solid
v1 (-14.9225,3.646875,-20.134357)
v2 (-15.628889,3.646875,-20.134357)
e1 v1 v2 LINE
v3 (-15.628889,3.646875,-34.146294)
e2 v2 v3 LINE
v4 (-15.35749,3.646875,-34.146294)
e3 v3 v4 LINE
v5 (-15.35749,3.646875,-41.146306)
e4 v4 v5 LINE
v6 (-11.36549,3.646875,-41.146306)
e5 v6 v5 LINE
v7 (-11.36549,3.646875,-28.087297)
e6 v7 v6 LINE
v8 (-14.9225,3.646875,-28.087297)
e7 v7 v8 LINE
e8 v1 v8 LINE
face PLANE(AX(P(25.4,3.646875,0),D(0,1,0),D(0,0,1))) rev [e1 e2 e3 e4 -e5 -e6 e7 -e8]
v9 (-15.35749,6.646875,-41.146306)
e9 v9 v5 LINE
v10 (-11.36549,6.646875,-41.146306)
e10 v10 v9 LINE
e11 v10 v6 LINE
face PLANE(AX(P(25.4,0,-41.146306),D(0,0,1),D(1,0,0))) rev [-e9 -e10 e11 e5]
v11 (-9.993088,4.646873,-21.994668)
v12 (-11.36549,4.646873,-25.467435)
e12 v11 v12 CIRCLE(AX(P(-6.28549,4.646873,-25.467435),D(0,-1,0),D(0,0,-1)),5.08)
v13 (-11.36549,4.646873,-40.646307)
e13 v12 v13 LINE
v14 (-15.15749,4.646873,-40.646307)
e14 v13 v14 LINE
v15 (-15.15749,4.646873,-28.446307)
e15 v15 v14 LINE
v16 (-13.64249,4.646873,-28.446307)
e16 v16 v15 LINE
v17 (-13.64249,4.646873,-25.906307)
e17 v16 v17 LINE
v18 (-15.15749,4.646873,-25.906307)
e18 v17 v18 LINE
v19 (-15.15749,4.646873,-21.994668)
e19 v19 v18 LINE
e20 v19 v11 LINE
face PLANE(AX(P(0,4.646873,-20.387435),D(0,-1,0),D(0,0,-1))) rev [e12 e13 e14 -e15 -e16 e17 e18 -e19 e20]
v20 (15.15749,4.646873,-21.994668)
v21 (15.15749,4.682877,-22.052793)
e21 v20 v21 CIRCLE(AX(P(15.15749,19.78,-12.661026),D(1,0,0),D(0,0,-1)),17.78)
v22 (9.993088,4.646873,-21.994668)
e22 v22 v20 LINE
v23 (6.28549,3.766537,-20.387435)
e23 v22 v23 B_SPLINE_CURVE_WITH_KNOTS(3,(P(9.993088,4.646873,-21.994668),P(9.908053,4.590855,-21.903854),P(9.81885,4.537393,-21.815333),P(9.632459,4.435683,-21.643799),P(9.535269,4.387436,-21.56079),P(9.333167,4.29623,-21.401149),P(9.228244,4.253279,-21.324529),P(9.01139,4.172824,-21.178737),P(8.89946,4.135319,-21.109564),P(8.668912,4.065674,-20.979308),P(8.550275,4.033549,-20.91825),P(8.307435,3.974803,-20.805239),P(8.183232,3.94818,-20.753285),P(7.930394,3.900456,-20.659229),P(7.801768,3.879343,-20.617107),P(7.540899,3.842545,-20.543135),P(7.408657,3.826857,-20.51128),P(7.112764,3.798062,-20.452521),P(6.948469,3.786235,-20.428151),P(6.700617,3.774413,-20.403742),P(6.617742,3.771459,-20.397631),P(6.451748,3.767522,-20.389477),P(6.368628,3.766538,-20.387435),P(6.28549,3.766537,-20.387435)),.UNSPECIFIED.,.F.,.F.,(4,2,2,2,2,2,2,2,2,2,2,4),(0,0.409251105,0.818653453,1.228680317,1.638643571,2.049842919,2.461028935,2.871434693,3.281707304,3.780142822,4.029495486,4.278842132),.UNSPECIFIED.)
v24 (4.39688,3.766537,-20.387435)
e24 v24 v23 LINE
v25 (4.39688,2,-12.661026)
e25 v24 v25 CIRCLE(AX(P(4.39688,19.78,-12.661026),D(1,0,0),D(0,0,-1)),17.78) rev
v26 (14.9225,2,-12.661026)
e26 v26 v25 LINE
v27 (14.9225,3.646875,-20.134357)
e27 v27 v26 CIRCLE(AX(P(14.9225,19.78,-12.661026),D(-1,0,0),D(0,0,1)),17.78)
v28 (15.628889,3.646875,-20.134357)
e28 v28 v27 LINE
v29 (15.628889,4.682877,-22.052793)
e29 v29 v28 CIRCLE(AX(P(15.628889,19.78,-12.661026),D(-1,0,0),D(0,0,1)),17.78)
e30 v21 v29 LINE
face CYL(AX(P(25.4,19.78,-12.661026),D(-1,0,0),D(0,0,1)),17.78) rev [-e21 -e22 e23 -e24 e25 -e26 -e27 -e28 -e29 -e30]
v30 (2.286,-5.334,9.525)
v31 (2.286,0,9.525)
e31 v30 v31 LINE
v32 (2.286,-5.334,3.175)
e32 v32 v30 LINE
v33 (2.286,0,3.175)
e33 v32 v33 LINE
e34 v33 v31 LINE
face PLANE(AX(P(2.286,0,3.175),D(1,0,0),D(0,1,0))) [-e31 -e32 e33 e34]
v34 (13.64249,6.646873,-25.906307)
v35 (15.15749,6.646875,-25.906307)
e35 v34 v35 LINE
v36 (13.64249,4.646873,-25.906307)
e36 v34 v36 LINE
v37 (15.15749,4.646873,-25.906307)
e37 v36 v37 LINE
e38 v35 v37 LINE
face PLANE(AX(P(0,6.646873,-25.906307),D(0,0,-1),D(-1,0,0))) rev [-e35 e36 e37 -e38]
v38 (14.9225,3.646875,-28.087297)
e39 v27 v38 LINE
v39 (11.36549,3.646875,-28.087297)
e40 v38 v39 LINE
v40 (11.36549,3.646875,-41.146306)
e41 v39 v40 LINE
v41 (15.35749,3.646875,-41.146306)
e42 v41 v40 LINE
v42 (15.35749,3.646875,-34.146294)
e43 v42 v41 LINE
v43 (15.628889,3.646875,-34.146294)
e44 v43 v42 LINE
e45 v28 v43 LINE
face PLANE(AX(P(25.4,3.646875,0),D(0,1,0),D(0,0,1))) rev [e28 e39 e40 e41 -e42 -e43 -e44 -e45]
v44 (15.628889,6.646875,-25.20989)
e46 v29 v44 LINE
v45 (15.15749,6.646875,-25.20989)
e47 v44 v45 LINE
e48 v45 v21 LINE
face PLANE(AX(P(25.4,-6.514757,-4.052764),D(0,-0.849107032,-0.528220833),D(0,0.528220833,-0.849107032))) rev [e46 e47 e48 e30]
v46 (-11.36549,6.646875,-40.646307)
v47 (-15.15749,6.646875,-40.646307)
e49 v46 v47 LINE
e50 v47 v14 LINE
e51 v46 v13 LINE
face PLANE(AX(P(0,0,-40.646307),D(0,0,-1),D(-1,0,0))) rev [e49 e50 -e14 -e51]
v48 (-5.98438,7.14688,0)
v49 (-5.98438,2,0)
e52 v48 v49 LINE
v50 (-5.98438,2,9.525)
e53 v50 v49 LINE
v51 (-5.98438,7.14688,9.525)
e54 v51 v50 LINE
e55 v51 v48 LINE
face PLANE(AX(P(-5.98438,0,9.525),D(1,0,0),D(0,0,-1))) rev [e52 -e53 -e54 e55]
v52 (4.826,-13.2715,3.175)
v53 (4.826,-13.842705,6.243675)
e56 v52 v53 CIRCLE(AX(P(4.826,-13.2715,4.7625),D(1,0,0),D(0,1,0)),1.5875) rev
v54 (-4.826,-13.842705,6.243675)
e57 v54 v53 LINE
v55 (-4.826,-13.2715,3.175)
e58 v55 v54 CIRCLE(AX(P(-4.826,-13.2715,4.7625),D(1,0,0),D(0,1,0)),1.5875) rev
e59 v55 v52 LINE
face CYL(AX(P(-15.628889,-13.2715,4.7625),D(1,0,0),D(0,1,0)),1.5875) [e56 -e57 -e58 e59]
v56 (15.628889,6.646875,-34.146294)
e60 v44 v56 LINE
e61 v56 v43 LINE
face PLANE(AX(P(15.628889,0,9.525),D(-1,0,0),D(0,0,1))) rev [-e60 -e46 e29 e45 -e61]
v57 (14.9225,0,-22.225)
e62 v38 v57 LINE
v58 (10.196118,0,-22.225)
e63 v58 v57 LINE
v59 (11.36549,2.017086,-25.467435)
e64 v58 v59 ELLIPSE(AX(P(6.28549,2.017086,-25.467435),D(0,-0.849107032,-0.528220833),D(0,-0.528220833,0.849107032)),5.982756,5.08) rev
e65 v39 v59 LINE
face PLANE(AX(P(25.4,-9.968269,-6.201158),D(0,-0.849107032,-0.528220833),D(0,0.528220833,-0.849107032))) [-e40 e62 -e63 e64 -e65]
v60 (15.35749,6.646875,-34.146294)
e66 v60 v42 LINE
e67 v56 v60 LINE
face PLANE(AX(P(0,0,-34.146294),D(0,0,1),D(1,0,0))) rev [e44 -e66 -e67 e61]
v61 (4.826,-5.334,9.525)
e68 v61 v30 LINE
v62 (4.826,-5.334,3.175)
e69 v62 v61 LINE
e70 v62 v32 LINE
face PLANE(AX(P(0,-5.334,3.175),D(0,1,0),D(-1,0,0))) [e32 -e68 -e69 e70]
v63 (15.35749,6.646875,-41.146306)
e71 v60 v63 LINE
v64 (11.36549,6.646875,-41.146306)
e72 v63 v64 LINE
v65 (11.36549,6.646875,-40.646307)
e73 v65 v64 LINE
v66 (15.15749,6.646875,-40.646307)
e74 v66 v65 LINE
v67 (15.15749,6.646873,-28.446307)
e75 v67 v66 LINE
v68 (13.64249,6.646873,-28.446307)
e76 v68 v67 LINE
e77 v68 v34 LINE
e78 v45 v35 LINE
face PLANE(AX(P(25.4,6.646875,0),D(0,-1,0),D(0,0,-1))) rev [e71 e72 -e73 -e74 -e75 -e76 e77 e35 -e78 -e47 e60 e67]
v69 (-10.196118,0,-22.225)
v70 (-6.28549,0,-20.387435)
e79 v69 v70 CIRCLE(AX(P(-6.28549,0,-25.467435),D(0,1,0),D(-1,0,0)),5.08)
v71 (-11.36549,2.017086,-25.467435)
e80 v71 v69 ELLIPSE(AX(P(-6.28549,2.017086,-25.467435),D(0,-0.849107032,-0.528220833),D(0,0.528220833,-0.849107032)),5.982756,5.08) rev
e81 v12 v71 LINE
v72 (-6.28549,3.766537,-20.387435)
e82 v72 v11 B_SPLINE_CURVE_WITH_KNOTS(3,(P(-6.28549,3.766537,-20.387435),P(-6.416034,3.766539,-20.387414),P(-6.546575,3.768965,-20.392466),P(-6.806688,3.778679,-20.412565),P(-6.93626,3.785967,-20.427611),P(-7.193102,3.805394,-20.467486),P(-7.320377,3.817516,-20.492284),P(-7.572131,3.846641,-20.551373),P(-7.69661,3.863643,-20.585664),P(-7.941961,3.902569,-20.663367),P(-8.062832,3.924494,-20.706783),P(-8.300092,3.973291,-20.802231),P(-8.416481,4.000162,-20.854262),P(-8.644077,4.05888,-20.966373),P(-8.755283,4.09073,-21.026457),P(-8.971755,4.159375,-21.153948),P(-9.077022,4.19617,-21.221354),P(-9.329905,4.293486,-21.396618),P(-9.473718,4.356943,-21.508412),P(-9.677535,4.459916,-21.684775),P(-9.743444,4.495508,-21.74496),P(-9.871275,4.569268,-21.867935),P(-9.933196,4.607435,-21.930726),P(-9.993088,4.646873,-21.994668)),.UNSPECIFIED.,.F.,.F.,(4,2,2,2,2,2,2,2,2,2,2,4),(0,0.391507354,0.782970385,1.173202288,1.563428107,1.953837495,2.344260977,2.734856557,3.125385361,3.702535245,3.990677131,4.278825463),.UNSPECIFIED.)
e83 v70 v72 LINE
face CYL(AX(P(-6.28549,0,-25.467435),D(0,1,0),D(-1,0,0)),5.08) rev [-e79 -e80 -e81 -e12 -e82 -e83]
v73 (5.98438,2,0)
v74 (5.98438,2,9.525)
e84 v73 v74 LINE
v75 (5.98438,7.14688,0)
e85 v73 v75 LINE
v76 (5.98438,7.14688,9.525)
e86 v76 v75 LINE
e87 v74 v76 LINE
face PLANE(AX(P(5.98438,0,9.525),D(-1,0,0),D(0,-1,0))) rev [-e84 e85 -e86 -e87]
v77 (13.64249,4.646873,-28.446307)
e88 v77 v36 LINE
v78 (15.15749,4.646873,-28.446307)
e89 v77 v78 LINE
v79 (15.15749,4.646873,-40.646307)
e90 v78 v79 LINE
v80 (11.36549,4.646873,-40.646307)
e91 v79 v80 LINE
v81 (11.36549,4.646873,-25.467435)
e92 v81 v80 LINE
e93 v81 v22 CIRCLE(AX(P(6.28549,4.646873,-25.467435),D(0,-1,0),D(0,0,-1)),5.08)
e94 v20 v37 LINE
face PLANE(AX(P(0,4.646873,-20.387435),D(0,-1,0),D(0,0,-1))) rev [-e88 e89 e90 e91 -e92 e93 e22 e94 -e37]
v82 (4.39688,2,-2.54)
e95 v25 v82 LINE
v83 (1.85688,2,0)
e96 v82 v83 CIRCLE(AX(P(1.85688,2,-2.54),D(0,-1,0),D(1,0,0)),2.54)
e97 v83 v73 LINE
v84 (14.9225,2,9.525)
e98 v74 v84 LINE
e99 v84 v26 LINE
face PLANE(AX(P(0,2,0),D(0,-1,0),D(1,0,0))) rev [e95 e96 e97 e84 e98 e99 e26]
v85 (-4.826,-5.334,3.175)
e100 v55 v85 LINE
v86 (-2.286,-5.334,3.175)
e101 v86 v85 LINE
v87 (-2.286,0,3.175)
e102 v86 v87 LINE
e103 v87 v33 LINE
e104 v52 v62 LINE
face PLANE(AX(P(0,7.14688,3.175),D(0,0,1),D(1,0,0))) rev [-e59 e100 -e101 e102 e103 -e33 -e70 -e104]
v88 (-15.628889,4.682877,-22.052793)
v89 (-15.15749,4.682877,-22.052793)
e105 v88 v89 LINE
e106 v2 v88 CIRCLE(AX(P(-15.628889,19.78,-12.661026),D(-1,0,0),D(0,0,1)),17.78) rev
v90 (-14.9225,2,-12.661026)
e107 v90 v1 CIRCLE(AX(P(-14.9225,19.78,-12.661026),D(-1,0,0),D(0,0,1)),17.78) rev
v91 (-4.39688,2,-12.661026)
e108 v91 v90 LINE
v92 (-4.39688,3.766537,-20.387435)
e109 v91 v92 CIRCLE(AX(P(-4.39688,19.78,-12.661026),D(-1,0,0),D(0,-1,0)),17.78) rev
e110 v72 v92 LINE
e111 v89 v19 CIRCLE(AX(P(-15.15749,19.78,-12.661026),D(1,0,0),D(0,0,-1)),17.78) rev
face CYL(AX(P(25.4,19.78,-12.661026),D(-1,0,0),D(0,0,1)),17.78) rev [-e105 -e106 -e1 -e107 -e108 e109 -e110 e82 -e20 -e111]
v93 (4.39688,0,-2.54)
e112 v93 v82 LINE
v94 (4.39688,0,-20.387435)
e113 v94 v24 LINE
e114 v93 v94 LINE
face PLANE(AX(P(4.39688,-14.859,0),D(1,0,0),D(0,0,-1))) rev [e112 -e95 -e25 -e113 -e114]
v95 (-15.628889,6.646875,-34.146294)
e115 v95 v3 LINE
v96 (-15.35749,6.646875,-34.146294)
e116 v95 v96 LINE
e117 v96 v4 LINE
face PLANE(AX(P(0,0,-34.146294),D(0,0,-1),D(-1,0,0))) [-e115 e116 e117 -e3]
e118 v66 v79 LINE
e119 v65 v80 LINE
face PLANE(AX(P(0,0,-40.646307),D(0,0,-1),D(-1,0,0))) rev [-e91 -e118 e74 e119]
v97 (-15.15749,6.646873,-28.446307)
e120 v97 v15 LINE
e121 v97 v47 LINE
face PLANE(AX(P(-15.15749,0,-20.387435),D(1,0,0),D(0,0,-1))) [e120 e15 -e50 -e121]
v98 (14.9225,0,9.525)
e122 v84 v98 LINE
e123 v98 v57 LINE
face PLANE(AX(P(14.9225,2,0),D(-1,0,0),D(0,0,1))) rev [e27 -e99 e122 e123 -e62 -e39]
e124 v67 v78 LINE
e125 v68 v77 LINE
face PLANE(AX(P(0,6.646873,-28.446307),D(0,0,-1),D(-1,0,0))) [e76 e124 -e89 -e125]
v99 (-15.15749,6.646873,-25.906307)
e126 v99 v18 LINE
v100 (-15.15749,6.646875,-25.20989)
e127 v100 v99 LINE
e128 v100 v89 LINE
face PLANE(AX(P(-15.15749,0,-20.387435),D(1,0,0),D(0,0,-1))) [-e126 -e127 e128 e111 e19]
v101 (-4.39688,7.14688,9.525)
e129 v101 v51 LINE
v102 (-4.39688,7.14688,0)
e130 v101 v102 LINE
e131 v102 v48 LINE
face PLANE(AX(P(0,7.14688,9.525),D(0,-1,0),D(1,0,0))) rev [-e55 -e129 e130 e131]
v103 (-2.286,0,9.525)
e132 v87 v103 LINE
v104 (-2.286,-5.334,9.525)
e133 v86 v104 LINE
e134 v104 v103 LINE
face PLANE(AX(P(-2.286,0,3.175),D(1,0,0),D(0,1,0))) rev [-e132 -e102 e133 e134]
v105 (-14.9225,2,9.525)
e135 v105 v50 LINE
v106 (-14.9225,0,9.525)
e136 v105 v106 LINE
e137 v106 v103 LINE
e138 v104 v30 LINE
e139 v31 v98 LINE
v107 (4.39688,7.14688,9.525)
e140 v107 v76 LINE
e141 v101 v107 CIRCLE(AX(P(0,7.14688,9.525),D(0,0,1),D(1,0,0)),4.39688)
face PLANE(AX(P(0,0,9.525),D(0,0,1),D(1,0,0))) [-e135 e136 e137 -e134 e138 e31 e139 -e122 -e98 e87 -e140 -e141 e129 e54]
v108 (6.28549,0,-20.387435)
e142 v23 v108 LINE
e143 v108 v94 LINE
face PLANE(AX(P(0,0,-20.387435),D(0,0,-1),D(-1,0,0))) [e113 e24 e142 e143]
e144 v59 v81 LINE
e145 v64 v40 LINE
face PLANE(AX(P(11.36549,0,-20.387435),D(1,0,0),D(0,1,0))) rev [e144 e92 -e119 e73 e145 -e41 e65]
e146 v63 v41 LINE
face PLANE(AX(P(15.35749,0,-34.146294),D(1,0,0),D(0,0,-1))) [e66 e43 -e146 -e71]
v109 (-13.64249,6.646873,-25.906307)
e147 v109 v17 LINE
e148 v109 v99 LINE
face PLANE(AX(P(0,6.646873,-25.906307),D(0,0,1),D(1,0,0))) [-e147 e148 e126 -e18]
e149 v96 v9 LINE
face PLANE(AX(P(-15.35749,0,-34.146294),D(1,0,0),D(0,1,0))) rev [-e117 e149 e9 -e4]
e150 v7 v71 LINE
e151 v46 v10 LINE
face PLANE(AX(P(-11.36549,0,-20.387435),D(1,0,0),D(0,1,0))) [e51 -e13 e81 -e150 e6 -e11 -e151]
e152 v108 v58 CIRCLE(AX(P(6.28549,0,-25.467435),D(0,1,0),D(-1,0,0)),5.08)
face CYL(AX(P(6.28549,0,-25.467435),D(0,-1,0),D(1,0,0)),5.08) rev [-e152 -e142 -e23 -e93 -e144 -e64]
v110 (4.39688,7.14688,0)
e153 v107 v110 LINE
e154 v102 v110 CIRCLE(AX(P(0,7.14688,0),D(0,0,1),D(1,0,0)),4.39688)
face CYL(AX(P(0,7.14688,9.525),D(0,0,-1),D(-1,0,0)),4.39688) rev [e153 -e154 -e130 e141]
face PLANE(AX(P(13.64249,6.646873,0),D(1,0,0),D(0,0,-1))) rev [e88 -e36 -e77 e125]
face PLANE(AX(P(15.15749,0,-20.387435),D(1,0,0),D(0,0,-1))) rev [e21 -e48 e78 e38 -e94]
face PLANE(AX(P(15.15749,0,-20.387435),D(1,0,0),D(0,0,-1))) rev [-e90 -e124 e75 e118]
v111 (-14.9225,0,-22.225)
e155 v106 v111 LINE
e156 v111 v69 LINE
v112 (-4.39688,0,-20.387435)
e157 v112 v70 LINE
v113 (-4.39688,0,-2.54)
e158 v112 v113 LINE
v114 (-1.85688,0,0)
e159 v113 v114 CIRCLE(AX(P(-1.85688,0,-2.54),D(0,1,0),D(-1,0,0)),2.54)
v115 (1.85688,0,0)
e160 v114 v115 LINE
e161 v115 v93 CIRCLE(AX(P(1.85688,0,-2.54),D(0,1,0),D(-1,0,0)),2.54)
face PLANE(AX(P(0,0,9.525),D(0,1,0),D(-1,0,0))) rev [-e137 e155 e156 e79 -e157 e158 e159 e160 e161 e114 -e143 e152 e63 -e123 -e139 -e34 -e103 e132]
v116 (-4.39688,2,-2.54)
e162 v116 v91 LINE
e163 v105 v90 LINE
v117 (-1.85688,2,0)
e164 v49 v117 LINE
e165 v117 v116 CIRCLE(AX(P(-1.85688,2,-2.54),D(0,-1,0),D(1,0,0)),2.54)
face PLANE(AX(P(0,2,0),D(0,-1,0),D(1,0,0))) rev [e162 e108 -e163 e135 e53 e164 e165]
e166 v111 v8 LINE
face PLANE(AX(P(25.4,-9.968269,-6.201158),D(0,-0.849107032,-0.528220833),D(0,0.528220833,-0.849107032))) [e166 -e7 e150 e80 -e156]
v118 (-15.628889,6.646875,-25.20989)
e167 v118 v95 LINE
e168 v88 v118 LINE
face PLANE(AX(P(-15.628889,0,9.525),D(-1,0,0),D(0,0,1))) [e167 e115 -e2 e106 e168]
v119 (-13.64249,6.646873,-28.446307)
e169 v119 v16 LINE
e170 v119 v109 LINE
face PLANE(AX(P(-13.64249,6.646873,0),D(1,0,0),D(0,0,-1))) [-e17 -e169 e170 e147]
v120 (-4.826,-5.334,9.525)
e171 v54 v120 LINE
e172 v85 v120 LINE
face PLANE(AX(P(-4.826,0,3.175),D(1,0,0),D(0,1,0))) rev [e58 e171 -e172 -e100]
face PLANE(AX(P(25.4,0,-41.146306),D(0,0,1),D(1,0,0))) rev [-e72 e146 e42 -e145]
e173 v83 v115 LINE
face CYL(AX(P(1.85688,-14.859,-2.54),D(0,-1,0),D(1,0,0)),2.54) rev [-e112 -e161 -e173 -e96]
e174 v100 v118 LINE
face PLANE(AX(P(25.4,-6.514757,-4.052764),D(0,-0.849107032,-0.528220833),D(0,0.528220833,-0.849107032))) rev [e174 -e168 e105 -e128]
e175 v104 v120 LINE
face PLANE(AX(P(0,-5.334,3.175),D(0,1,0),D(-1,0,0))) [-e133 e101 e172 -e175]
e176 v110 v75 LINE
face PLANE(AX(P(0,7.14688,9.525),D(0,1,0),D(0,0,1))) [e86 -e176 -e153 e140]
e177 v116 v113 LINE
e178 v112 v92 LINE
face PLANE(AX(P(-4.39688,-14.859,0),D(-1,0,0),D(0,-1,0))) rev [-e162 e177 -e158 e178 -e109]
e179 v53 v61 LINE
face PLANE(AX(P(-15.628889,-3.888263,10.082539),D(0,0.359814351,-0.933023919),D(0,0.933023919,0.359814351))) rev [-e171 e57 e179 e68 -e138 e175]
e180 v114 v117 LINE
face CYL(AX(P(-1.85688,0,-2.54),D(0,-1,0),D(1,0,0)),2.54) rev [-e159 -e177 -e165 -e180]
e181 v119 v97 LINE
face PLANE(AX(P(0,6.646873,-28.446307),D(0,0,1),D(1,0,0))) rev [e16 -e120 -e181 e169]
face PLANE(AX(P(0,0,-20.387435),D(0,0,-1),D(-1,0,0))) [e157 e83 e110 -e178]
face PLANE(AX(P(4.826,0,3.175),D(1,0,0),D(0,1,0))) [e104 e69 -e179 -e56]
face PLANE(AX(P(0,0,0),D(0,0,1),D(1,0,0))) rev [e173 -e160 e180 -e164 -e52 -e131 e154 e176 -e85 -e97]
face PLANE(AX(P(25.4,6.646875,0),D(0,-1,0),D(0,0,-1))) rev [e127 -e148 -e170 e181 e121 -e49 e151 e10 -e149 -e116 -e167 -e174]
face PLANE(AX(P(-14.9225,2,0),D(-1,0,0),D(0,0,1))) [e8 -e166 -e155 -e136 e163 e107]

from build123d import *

# Parameters (mm, degrees)
SKETCH2_W               = 11.9687594
SKETCH2_H               = 2.75
BOSS_EXTRUDE1_DEPTH     = 9.525
BOSS_EXTRUDE2_START     = 3.175
SKETCH2_3_W             = 11.9687594
SKETCH2_3_H             = 2.75
SKETCH2_3_W_2           = 4.572
SKETCH2_3_H_2           = 5.334
BOSS_EXTRUDE2_DEPTH     = 6.35
BOSS_EXTRUDE3_DEPTH     = 2
BOSS_EXTRUDE7_DEPTH     = 25.4
SKETCH5_W               = 9.771111266
SKETCH5_H               = 3
CUT_EXTRUDE1_DEPTH      = 78.484078326
SKETCH6_W               = 30.314979468
SKETCH6_H               = 2.000002
SKETCH6_W_2             = 22.73097918
SKETCH6_H_2             = 6.646875
CUT_EXTRUDE2_DEPTH      = 20.258872
CUT_EXTRUDE3_START      = 0.499999
SKETCH6_3_W             = 22.73097918
SKETCH6_3_H             = 2.000002
SKETCH6_3_H_2           = 4.646873
SKETCH6_3_W_2           = 0.271399
SKETCH6_3_H_3           = 3
CUT_EXTRUDE3_DEPTH      = 7.0000114
FILLET2_R               = 17.78
CUT_EXTRUDE4_DEPTH      = 48.132860149
CUT_EXTRUDE4_DEPTH_BACK = 48.132860149
SKETCH7_W               = 8.7937594
SKETCH7_H               = 20.387434944
FILLET3_R               = 2.54
SKETCH8_W               = 1.515000072
SKETCH8_H               = 2.54
BOSS_EXTRUDE8_DEPTH     = 2
FILLET4_R               = 5.08
CUT_EXTRUDE5_DEPTH      = 49.292968639


with BuildPart() as part:
    # Sketch2 → Boss-Extrude1 (new body)
    with BuildSketch(Plane.XY):
        with BuildLine():
            ThreePointArc((-9e-09, 2.75), (-3.109063455, 4.037816251), (-4.3968797, 7.1468797))
            Line((-4.3968797, 7.1468797), (-5.9843797, 7.1468797))
            Line((-5.9843797, 7.1468797), (-5.9843797, 2.75))
            Line((-5.9843797, 2.75), (-9e-09, 2.75))
        make_face()
        with BuildLine():
            Line((5.9843797, 7.1468797), (4.3968797, 7.1468797))
            ThreePointArc((4.3968797, 7.1468797), (3.109063449, 4.037816245), (-9e-09, 2.75))
            Line((-9e-09, 2.75), (5.9843797, 2.75))
            Line((5.9843797, 2.75), (5.9843797, 7.1468797))
        make_face()
        with Locations((0, 1.375)):
            Rectangle(SKETCH2_W, SKETCH2_H)
    extrude(amount=BOSS_EXTRUDE1_DEPTH)

    # Sketch2<3> → Boss-Extrude2 (add)
    with BuildSketch(Plane.XY.offset(BOSS_EXTRUDE2_START)):
        with Locations((0, 1.375)):
            Rectangle(SKETCH2_3_W, SKETCH2_3_H)
        with BuildLine():
            ThreePointArc((-9e-09, 2.75), (-3.109063455, 4.037816251), (-4.3968797, 7.1468797))
            Line((-4.3968797, 7.1468797), (-5.9843797, 7.1468797))
            Line((-5.9843797, 7.1468797), (-5.9843797, 2.75))
            Line((-5.9843797, 2.75), (-9e-09, 2.75))
        make_face()
        with BuildLine():
            Line((5.9843797, 7.1468797), (4.3968797, 7.1468797))
            ThreePointArc((4.3968797, 7.1468797), (3.109063449, 4.037816245), (-9e-09, 2.75))
            Line((-9e-09, 2.75), (5.9843797, 2.75))
            Line((5.9843797, 2.75), (5.9843797, 7.1468797))
        make_face()
        with Locations((0, -2.667)):
            Rectangle(SKETCH2_3_W_2, SKETCH2_3_H_2)
        Polygon((2.286, -5.334), (-2.286, -5.334), (-4.826, -5.334), (-4.826, -14.859), (4.826, -14.859), (4.826, -5.334), align=None)
    extrude(amount=BOSS_EXTRUDE2_DEPTH)

    # Sketch3 → Boss-Extrude3 (add)
    with BuildSketch(Plane.XZ):
        Polygon((14.9225, 9.525), (-14.9225, 9.525), (-14.9225, -22.225), (-10.85748959, -22.225), (10.85748959, -22.225), (14.9225, -22.225), align=None)
    extrude(amount=-BOSS_EXTRUDE3_DEPTH)

    # Sketch4<6> → Boss-Extrude7 (add, symmetric)
    with BuildSketch(Plane(origin=(0, 0, 0), x_dir=(0, 0, -1), z_dir=(1, 0, 0))):
        Polygon((28.087296632, 3.646875), (41.146305566, 3.646875), (41.146305566, 6.646875), (25.209889757, 6.646875), (17.740108187, 2), (22.225, 0), align=None)
    extrude(amount=BOSS_EXTRUDE7_DEPTH, both=True)

    # Sketch5 → Cut-Extrude1 (cut, through all)
    with BuildSketch(Plane(origin=(0, 37.971305566, -41.146305566), x_dir=(1, 0, 0), z_dir=(0, 0, 1))):
        Polygon((25.4, -37.971305566), (25.4, -34.324430566), (15.628888734, -34.324430566), (14.9225, -34.324430566), (14.9225, -37.971305566), align=None)
        with Locations((20.514444367, -32.824430566)):
            Rectangle(SKETCH5_W, SKETCH5_H)
        Polygon((-25.4, -34.324430566), (-25.4, -37.971305566), (-14.9225, -37.971305566), (-14.9225, -34.324430566), (-15.628888734, -34.324430566), align=None)
        with Locations((-20.514444367, -32.824430566)):
            Rectangle(SKETCH5_W, SKETCH5_H)
    extrude(amount=CUT_EXTRUDE1_DEPTH, mode=Mode.SUBTRACT)

    # Sketch6 → Cut-Extrude2 (cut)
    with BuildSketch(Plane(origin=(0, 0, -40.646306566), x_dir=(-1, 0, 0), z_dir=(0, 0, -1))):
        with Locations((0, 5.646874)):
            Rectangle(SKETCH6_W, SKETCH6_H)
        with Locations((0, 3.3234375)):
            Rectangle(SKETCH6_W_2, SKETCH6_H_2)
    extrude(amount=-CUT_EXTRUDE2_DEPTH, mode=Mode.SUBTRACT)

    # Sketch6<3> → Cut-Extrude3 (cut)
    with BuildSketch(Plane(origin=(0, 0, -40.646306566), x_dir=(-1, 0, 0), z_dir=(0, 0, -1)).offset(CUT_EXTRUDE3_START)):
        with Locations((0, 5.646874)):
            Rectangle(SKETCH6_3_W, SKETCH6_3_H)
        with Locations((0, 2.3234365)):
            Rectangle(SKETCH6_3_W, SKETCH6_3_H_2)
        with Locations((-15.493189234, 5.146875)):
            Rectangle(SKETCH6_3_W_2, SKETCH6_3_H_3)
        with Locations((15.493189234, 5.146875)):
            Rectangle(SKETCH6_3_W_2, SKETCH6_3_H_3)
    extrude(amount=-CUT_EXTRUDE3_DEPTH, mode=Mode.SUBTRACT)

    # Fillet2
    # the kernel refuses this fillet: 17.78 mm, written as the material it adds along each edge
    with BuildSketch(Plane(origin=(27.620205217, 2, -17.740108187), x_dir=(0, 0.5282208325858079, -0.8491070321357349), z_dir=(-1, 0, 0))) as fillet2_piece_1_section:
        with BuildLine():
            CenterArc((FILLET2_R * 0.285662659546, -FILLET2_R), FILLET2_R, 90, 31.885322289)
            Line((-FILLET2_R * 0.242558173039, -FILLET2_R * 0.150892967864), (0, 0))
            Line((0, 0), (FILLET2_R * 0.285662659546, 0))
        make_face()
    fillet2_piece_1 = extrude(amount=55.240410434, mode=Mode.PRIVATE)
    fillet2_piece_1 = split(fillet2_piece_1, bisect_by=Plane(origin=(15.393189234, 3.646875, -22.00929754), z_dir=(0, 1, 0)), keep=Keep.TOP, mode=Mode.PRIVATE)
    fillet2_piece_1 = split(fillet2_piece_1, bisect_by=Plane(origin=(15.628888734, 4.655865618, -22.00929754), z_dir=(-1, 0, 0)), keep=Keep.TOP, mode=Mode.PRIVATE)
    fillet2_piece_1 = split(fillet2_piece_1, bisect_by=Plane(origin=(15.157489734, 4.655865618, -22.00929754), z_dir=(1, 0, 0)), keep=Keep.TOP, mode=Mode.PRIVATE)
    add(fillet2_piece_1)
    with BuildSketch(Plane(origin=(27.620205217, 2, -17.740108187), x_dir=(0, 0.5282208325858079, -0.8491070321357349), z_dir=(-1, 0, 0))) as fillet2_piece_2_section:
        with BuildLine():
            CenterArc((FILLET2_R * 0.285662659546, -FILLET2_R), FILLET2_R, 90, 31.885322289)
            Line((-FILLET2_R * 0.242558173039, -FILLET2_R * 0.150892967864), (0, 0))
            Line((0, 0), (FILLET2_R * 0.285662659546, 0))
        make_face()
    fillet2_piece_2 = extrude(amount=55.240410434, mode=Mode.PRIVATE)
    fillet2_piece_2 = split(fillet2_piece_2, bisect_by=Plane(origin=(15.039994889, 3.646875, -20.807533434), z_dir=(0, 1, 0)), keep=Keep.TOP, mode=Mode.PRIVATE)
    fillet2_piece_2 = split(fillet2_piece_2, bisect_by=Plane(origin=(15.157489734, 3.944287392, -20.807533434), z_dir=(-1, 0, 0)), keep=Keep.TOP, mode=Mode.PRIVATE)
    fillet2_piece_2 = split(fillet2_piece_2, bisect_by=Plane(origin=(15.039994889, 4.646873, -20.807533434), z_dir=(0, -1, 0)), keep=Keep.TOP, mode=Mode.PRIVATE)
    fillet2_piece_2 = split(fillet2_piece_2, bisect_by=Plane(origin=(11.36548959, 3.944287392, -20.807533434), z_dir=(1, 0, 0)), keep=Keep.TOP, mode=Mode.PRIVATE)
    add(fillet2_piece_2)
    with BuildSketch(Plane(origin=(14.9225, 2, -17.740108187), x_dir=(0, 0.528220832585808, -0.8491070321357348), z_dir=(-1, 0, 0))) as fillet2_piece_3_section:
        with BuildLine():
            CenterArc((FILLET2_R * 0.285662659546, -FILLET2_R), FILLET2_R, 90, 31.885322289)
            Line((-FILLET2_R * 0.242558173039, -FILLET2_R * 0.150892967864), (0, 0))
            Line((0, 0), (FILLET2_R * 0.285662659546, 0))
        make_face()
    fillet2_piece_3 = extrude(amount=29.845, mode=Mode.PRIVATE)
    fillet2_piece_3 = split(fillet2_piece_3, bisect_by=Plane(origin=(13.143994801, 2.494402422, -20.387434566), z_dir=(0, 0, 1)), keep=Keep.TOP, mode=Mode.PRIVATE)
    add(fillet2_piece_3)
    with BuildSketch(Plane(origin=(27.620205217, 2, -17.740108187), x_dir=(0, 0.5282208325858079, -0.8491070321357349), z_dir=(-1, 0, 0))) as fillet2_piece_4_section:
        with BuildLine():
            CenterArc((FILLET2_R * 0.285662659546, -FILLET2_R), FILLET2_R, 90, 31.885322289)
            Line((-FILLET2_R * 0.242558173039, -FILLET2_R * 0.150892967864), (0, 0))
            Line((0, 0), (FILLET2_R * 0.285662659546, 0))
        make_face()
    fillet2_piece_4 = extrude(amount=55.240410434, mode=Mode.PRIVATE)
    fillet2_piece_4 = split(fillet2_piece_4, bisect_by=Plane(origin=(-15.628888734, 3.94428727, -20.807533615), z_dir=(1, 0, 0)), keep=Keep.TOP, mode=Mode.PRIVATE)
    fillet2_piece_4 = split(fillet2_piece_4, bisect_by=Plane(origin=(-13.143995303, 3.646875, -20.807533615), z_dir=(0, 1, 0)), keep=Keep.TOP, mode=Mode.PRIVATE)
    fillet2_piece_4 = split(fillet2_piece_4, bisect_by=Plane(origin=(-13.143995303, 4.646873, -20.807533615), z_dir=(0, -1, 0)), keep=Keep.TOP, mode=Mode.PRIVATE)
    fillet2_piece_4 = split(fillet2_piece_4, bisect_by=Plane(origin=(-11.36548959, 3.94428727, -20.807533615), z_dir=(-1, 0, 0)), keep=Keep.TOP, mode=Mode.PRIVATE)
    add(fillet2_piece_4)
    with BuildSketch(Plane(origin=(27.620205217, 2, -17.740108187), x_dir=(0, 0.5282208325858079, -0.8491070321357349), z_dir=(-1, 0, 0))) as fillet2_piece_5_section:
        with BuildLine():
            CenterArc((FILLET2_R * 0.285662659546, -FILLET2_R), FILLET2_R, 90, 31.885322289)
            Line((-FILLET2_R * 0.242558173039, -FILLET2_R * 0.150892967864), (0, 0))
            Line((0, 0), (FILLET2_R * 0.285662659546, 0))
        make_face()
    fillet2_piece_5 = extrude(amount=55.240410434, mode=Mode.PRIVATE)
    fillet2_piece_5 = split(fillet2_piece_5, bisect_by=Plane(origin=(-15.628888734, 4.655865618, -22.00929754), z_dir=(1, 0, 0)), keep=Keep.TOP, mode=Mode.PRIVATE)
    fillet2_piece_5 = split(fillet2_piece_5, bisect_by=Plane(origin=(-15.393189234, 4.655865618, -20.387434566), z_dir=(0, 0, -1)), keep=Keep.TOP, mode=Mode.PRIVATE)
    fillet2_piece_5 = split(fillet2_piece_5, bisect_by=Plane(origin=(-15.157489734, 4.655865618, -22.00929754), z_dir=(-1, 0, 0)), keep=Keep.TOP, mode=Mode.PRIVATE)
    add(fillet2_piece_5)

    # Sketch7 → Cut-Extrude4 (cut, two sides: drawn at the far end of the back side and taken through both)
    with BuildSketch(Plane(origin=(0, 2, 0), x_dir=(1, 0, 0), z_dir=(0, 1, 0)).offset(-CUT_EXTRUDE4_DEPTH_BACK)):
        with Locations((0, 10.193717472)):
            Rectangle(SKETCH7_W, SKETCH7_H)
    extrude(amount=CUT_EXTRUDE4_DEPTH + CUT_EXTRUDE4_DEPTH_BACK, mode=Mode.SUBTRACT)

    # Fillet3
    fillet3_edges = [part.edges().sort_by_distance(p)[0] for p in [
        (4.3968797, 1, 0),
        (-4.3968797, 1, 0),
    ]]
    fillet(fillet3_edges, radius=FILLET3_R)

    # Sketch8 → Boss-Extrude8 (add)
    with BuildSketch(Plane(origin=(0, 4.646873, 0), x_dir=(1, 0, 0), z_dir=(0, 1, 0))):
        with Locations((-14.399989698, 27.176306566)):
            Rectangle(SKETCH8_W, SKETCH8_H)
        with Locations((14.399989698, 27.176306566)):
            Rectangle(SKETCH8_W, SKETCH8_H)
    extrude(amount=BOSS_EXTRUDE8_DEPTH)

    # Fillet4
    fillet4_edges = [part.edges().sort_by_distance(p)[0] for p in [
        (11.36548959, 1.883268266, -20.387434566),
        (-11.36548959, 1.883268266, -20.387434566),
    ]]
    fillet(fillet4_edges, radius=FILLET4_R)

    # Sketch10 → Cut-Extrude5 (cut, through all)
    with BuildSketch(Plane(origin=(4.826, 0, 0), x_dir=(0, 0, -1), z_dir=(1, 0, 0))):
        with BuildLine():
            Line((-6.243675471, -13.842705282), (-9.525, -5.334))
            Line((-9.525, -5.334), (-9.525, -14.859))
            Line((-9.525, -14.859), (-4.7625, -14.859))
            ThreePointArc((-4.7625, -14.859), (-5.660655851, -14.580496684), (-6.243675471, -13.842705282))
        make_face()
        with BuildLine():
            ThreePointArc((-3.175, -13.2715), (-3.639967985, -14.394032015), (-4.7625, -14.859))
            Line((-4.7625, -14.859), (-3.175, -14.859))
            Line((-3.175, -14.859), (-3.175, -13.2715))
        make_face()
    extrude(amount=-CUT_EXTRUDE5_DEPTH, mode=Mode.SUBTRACT)


solid = part.part
